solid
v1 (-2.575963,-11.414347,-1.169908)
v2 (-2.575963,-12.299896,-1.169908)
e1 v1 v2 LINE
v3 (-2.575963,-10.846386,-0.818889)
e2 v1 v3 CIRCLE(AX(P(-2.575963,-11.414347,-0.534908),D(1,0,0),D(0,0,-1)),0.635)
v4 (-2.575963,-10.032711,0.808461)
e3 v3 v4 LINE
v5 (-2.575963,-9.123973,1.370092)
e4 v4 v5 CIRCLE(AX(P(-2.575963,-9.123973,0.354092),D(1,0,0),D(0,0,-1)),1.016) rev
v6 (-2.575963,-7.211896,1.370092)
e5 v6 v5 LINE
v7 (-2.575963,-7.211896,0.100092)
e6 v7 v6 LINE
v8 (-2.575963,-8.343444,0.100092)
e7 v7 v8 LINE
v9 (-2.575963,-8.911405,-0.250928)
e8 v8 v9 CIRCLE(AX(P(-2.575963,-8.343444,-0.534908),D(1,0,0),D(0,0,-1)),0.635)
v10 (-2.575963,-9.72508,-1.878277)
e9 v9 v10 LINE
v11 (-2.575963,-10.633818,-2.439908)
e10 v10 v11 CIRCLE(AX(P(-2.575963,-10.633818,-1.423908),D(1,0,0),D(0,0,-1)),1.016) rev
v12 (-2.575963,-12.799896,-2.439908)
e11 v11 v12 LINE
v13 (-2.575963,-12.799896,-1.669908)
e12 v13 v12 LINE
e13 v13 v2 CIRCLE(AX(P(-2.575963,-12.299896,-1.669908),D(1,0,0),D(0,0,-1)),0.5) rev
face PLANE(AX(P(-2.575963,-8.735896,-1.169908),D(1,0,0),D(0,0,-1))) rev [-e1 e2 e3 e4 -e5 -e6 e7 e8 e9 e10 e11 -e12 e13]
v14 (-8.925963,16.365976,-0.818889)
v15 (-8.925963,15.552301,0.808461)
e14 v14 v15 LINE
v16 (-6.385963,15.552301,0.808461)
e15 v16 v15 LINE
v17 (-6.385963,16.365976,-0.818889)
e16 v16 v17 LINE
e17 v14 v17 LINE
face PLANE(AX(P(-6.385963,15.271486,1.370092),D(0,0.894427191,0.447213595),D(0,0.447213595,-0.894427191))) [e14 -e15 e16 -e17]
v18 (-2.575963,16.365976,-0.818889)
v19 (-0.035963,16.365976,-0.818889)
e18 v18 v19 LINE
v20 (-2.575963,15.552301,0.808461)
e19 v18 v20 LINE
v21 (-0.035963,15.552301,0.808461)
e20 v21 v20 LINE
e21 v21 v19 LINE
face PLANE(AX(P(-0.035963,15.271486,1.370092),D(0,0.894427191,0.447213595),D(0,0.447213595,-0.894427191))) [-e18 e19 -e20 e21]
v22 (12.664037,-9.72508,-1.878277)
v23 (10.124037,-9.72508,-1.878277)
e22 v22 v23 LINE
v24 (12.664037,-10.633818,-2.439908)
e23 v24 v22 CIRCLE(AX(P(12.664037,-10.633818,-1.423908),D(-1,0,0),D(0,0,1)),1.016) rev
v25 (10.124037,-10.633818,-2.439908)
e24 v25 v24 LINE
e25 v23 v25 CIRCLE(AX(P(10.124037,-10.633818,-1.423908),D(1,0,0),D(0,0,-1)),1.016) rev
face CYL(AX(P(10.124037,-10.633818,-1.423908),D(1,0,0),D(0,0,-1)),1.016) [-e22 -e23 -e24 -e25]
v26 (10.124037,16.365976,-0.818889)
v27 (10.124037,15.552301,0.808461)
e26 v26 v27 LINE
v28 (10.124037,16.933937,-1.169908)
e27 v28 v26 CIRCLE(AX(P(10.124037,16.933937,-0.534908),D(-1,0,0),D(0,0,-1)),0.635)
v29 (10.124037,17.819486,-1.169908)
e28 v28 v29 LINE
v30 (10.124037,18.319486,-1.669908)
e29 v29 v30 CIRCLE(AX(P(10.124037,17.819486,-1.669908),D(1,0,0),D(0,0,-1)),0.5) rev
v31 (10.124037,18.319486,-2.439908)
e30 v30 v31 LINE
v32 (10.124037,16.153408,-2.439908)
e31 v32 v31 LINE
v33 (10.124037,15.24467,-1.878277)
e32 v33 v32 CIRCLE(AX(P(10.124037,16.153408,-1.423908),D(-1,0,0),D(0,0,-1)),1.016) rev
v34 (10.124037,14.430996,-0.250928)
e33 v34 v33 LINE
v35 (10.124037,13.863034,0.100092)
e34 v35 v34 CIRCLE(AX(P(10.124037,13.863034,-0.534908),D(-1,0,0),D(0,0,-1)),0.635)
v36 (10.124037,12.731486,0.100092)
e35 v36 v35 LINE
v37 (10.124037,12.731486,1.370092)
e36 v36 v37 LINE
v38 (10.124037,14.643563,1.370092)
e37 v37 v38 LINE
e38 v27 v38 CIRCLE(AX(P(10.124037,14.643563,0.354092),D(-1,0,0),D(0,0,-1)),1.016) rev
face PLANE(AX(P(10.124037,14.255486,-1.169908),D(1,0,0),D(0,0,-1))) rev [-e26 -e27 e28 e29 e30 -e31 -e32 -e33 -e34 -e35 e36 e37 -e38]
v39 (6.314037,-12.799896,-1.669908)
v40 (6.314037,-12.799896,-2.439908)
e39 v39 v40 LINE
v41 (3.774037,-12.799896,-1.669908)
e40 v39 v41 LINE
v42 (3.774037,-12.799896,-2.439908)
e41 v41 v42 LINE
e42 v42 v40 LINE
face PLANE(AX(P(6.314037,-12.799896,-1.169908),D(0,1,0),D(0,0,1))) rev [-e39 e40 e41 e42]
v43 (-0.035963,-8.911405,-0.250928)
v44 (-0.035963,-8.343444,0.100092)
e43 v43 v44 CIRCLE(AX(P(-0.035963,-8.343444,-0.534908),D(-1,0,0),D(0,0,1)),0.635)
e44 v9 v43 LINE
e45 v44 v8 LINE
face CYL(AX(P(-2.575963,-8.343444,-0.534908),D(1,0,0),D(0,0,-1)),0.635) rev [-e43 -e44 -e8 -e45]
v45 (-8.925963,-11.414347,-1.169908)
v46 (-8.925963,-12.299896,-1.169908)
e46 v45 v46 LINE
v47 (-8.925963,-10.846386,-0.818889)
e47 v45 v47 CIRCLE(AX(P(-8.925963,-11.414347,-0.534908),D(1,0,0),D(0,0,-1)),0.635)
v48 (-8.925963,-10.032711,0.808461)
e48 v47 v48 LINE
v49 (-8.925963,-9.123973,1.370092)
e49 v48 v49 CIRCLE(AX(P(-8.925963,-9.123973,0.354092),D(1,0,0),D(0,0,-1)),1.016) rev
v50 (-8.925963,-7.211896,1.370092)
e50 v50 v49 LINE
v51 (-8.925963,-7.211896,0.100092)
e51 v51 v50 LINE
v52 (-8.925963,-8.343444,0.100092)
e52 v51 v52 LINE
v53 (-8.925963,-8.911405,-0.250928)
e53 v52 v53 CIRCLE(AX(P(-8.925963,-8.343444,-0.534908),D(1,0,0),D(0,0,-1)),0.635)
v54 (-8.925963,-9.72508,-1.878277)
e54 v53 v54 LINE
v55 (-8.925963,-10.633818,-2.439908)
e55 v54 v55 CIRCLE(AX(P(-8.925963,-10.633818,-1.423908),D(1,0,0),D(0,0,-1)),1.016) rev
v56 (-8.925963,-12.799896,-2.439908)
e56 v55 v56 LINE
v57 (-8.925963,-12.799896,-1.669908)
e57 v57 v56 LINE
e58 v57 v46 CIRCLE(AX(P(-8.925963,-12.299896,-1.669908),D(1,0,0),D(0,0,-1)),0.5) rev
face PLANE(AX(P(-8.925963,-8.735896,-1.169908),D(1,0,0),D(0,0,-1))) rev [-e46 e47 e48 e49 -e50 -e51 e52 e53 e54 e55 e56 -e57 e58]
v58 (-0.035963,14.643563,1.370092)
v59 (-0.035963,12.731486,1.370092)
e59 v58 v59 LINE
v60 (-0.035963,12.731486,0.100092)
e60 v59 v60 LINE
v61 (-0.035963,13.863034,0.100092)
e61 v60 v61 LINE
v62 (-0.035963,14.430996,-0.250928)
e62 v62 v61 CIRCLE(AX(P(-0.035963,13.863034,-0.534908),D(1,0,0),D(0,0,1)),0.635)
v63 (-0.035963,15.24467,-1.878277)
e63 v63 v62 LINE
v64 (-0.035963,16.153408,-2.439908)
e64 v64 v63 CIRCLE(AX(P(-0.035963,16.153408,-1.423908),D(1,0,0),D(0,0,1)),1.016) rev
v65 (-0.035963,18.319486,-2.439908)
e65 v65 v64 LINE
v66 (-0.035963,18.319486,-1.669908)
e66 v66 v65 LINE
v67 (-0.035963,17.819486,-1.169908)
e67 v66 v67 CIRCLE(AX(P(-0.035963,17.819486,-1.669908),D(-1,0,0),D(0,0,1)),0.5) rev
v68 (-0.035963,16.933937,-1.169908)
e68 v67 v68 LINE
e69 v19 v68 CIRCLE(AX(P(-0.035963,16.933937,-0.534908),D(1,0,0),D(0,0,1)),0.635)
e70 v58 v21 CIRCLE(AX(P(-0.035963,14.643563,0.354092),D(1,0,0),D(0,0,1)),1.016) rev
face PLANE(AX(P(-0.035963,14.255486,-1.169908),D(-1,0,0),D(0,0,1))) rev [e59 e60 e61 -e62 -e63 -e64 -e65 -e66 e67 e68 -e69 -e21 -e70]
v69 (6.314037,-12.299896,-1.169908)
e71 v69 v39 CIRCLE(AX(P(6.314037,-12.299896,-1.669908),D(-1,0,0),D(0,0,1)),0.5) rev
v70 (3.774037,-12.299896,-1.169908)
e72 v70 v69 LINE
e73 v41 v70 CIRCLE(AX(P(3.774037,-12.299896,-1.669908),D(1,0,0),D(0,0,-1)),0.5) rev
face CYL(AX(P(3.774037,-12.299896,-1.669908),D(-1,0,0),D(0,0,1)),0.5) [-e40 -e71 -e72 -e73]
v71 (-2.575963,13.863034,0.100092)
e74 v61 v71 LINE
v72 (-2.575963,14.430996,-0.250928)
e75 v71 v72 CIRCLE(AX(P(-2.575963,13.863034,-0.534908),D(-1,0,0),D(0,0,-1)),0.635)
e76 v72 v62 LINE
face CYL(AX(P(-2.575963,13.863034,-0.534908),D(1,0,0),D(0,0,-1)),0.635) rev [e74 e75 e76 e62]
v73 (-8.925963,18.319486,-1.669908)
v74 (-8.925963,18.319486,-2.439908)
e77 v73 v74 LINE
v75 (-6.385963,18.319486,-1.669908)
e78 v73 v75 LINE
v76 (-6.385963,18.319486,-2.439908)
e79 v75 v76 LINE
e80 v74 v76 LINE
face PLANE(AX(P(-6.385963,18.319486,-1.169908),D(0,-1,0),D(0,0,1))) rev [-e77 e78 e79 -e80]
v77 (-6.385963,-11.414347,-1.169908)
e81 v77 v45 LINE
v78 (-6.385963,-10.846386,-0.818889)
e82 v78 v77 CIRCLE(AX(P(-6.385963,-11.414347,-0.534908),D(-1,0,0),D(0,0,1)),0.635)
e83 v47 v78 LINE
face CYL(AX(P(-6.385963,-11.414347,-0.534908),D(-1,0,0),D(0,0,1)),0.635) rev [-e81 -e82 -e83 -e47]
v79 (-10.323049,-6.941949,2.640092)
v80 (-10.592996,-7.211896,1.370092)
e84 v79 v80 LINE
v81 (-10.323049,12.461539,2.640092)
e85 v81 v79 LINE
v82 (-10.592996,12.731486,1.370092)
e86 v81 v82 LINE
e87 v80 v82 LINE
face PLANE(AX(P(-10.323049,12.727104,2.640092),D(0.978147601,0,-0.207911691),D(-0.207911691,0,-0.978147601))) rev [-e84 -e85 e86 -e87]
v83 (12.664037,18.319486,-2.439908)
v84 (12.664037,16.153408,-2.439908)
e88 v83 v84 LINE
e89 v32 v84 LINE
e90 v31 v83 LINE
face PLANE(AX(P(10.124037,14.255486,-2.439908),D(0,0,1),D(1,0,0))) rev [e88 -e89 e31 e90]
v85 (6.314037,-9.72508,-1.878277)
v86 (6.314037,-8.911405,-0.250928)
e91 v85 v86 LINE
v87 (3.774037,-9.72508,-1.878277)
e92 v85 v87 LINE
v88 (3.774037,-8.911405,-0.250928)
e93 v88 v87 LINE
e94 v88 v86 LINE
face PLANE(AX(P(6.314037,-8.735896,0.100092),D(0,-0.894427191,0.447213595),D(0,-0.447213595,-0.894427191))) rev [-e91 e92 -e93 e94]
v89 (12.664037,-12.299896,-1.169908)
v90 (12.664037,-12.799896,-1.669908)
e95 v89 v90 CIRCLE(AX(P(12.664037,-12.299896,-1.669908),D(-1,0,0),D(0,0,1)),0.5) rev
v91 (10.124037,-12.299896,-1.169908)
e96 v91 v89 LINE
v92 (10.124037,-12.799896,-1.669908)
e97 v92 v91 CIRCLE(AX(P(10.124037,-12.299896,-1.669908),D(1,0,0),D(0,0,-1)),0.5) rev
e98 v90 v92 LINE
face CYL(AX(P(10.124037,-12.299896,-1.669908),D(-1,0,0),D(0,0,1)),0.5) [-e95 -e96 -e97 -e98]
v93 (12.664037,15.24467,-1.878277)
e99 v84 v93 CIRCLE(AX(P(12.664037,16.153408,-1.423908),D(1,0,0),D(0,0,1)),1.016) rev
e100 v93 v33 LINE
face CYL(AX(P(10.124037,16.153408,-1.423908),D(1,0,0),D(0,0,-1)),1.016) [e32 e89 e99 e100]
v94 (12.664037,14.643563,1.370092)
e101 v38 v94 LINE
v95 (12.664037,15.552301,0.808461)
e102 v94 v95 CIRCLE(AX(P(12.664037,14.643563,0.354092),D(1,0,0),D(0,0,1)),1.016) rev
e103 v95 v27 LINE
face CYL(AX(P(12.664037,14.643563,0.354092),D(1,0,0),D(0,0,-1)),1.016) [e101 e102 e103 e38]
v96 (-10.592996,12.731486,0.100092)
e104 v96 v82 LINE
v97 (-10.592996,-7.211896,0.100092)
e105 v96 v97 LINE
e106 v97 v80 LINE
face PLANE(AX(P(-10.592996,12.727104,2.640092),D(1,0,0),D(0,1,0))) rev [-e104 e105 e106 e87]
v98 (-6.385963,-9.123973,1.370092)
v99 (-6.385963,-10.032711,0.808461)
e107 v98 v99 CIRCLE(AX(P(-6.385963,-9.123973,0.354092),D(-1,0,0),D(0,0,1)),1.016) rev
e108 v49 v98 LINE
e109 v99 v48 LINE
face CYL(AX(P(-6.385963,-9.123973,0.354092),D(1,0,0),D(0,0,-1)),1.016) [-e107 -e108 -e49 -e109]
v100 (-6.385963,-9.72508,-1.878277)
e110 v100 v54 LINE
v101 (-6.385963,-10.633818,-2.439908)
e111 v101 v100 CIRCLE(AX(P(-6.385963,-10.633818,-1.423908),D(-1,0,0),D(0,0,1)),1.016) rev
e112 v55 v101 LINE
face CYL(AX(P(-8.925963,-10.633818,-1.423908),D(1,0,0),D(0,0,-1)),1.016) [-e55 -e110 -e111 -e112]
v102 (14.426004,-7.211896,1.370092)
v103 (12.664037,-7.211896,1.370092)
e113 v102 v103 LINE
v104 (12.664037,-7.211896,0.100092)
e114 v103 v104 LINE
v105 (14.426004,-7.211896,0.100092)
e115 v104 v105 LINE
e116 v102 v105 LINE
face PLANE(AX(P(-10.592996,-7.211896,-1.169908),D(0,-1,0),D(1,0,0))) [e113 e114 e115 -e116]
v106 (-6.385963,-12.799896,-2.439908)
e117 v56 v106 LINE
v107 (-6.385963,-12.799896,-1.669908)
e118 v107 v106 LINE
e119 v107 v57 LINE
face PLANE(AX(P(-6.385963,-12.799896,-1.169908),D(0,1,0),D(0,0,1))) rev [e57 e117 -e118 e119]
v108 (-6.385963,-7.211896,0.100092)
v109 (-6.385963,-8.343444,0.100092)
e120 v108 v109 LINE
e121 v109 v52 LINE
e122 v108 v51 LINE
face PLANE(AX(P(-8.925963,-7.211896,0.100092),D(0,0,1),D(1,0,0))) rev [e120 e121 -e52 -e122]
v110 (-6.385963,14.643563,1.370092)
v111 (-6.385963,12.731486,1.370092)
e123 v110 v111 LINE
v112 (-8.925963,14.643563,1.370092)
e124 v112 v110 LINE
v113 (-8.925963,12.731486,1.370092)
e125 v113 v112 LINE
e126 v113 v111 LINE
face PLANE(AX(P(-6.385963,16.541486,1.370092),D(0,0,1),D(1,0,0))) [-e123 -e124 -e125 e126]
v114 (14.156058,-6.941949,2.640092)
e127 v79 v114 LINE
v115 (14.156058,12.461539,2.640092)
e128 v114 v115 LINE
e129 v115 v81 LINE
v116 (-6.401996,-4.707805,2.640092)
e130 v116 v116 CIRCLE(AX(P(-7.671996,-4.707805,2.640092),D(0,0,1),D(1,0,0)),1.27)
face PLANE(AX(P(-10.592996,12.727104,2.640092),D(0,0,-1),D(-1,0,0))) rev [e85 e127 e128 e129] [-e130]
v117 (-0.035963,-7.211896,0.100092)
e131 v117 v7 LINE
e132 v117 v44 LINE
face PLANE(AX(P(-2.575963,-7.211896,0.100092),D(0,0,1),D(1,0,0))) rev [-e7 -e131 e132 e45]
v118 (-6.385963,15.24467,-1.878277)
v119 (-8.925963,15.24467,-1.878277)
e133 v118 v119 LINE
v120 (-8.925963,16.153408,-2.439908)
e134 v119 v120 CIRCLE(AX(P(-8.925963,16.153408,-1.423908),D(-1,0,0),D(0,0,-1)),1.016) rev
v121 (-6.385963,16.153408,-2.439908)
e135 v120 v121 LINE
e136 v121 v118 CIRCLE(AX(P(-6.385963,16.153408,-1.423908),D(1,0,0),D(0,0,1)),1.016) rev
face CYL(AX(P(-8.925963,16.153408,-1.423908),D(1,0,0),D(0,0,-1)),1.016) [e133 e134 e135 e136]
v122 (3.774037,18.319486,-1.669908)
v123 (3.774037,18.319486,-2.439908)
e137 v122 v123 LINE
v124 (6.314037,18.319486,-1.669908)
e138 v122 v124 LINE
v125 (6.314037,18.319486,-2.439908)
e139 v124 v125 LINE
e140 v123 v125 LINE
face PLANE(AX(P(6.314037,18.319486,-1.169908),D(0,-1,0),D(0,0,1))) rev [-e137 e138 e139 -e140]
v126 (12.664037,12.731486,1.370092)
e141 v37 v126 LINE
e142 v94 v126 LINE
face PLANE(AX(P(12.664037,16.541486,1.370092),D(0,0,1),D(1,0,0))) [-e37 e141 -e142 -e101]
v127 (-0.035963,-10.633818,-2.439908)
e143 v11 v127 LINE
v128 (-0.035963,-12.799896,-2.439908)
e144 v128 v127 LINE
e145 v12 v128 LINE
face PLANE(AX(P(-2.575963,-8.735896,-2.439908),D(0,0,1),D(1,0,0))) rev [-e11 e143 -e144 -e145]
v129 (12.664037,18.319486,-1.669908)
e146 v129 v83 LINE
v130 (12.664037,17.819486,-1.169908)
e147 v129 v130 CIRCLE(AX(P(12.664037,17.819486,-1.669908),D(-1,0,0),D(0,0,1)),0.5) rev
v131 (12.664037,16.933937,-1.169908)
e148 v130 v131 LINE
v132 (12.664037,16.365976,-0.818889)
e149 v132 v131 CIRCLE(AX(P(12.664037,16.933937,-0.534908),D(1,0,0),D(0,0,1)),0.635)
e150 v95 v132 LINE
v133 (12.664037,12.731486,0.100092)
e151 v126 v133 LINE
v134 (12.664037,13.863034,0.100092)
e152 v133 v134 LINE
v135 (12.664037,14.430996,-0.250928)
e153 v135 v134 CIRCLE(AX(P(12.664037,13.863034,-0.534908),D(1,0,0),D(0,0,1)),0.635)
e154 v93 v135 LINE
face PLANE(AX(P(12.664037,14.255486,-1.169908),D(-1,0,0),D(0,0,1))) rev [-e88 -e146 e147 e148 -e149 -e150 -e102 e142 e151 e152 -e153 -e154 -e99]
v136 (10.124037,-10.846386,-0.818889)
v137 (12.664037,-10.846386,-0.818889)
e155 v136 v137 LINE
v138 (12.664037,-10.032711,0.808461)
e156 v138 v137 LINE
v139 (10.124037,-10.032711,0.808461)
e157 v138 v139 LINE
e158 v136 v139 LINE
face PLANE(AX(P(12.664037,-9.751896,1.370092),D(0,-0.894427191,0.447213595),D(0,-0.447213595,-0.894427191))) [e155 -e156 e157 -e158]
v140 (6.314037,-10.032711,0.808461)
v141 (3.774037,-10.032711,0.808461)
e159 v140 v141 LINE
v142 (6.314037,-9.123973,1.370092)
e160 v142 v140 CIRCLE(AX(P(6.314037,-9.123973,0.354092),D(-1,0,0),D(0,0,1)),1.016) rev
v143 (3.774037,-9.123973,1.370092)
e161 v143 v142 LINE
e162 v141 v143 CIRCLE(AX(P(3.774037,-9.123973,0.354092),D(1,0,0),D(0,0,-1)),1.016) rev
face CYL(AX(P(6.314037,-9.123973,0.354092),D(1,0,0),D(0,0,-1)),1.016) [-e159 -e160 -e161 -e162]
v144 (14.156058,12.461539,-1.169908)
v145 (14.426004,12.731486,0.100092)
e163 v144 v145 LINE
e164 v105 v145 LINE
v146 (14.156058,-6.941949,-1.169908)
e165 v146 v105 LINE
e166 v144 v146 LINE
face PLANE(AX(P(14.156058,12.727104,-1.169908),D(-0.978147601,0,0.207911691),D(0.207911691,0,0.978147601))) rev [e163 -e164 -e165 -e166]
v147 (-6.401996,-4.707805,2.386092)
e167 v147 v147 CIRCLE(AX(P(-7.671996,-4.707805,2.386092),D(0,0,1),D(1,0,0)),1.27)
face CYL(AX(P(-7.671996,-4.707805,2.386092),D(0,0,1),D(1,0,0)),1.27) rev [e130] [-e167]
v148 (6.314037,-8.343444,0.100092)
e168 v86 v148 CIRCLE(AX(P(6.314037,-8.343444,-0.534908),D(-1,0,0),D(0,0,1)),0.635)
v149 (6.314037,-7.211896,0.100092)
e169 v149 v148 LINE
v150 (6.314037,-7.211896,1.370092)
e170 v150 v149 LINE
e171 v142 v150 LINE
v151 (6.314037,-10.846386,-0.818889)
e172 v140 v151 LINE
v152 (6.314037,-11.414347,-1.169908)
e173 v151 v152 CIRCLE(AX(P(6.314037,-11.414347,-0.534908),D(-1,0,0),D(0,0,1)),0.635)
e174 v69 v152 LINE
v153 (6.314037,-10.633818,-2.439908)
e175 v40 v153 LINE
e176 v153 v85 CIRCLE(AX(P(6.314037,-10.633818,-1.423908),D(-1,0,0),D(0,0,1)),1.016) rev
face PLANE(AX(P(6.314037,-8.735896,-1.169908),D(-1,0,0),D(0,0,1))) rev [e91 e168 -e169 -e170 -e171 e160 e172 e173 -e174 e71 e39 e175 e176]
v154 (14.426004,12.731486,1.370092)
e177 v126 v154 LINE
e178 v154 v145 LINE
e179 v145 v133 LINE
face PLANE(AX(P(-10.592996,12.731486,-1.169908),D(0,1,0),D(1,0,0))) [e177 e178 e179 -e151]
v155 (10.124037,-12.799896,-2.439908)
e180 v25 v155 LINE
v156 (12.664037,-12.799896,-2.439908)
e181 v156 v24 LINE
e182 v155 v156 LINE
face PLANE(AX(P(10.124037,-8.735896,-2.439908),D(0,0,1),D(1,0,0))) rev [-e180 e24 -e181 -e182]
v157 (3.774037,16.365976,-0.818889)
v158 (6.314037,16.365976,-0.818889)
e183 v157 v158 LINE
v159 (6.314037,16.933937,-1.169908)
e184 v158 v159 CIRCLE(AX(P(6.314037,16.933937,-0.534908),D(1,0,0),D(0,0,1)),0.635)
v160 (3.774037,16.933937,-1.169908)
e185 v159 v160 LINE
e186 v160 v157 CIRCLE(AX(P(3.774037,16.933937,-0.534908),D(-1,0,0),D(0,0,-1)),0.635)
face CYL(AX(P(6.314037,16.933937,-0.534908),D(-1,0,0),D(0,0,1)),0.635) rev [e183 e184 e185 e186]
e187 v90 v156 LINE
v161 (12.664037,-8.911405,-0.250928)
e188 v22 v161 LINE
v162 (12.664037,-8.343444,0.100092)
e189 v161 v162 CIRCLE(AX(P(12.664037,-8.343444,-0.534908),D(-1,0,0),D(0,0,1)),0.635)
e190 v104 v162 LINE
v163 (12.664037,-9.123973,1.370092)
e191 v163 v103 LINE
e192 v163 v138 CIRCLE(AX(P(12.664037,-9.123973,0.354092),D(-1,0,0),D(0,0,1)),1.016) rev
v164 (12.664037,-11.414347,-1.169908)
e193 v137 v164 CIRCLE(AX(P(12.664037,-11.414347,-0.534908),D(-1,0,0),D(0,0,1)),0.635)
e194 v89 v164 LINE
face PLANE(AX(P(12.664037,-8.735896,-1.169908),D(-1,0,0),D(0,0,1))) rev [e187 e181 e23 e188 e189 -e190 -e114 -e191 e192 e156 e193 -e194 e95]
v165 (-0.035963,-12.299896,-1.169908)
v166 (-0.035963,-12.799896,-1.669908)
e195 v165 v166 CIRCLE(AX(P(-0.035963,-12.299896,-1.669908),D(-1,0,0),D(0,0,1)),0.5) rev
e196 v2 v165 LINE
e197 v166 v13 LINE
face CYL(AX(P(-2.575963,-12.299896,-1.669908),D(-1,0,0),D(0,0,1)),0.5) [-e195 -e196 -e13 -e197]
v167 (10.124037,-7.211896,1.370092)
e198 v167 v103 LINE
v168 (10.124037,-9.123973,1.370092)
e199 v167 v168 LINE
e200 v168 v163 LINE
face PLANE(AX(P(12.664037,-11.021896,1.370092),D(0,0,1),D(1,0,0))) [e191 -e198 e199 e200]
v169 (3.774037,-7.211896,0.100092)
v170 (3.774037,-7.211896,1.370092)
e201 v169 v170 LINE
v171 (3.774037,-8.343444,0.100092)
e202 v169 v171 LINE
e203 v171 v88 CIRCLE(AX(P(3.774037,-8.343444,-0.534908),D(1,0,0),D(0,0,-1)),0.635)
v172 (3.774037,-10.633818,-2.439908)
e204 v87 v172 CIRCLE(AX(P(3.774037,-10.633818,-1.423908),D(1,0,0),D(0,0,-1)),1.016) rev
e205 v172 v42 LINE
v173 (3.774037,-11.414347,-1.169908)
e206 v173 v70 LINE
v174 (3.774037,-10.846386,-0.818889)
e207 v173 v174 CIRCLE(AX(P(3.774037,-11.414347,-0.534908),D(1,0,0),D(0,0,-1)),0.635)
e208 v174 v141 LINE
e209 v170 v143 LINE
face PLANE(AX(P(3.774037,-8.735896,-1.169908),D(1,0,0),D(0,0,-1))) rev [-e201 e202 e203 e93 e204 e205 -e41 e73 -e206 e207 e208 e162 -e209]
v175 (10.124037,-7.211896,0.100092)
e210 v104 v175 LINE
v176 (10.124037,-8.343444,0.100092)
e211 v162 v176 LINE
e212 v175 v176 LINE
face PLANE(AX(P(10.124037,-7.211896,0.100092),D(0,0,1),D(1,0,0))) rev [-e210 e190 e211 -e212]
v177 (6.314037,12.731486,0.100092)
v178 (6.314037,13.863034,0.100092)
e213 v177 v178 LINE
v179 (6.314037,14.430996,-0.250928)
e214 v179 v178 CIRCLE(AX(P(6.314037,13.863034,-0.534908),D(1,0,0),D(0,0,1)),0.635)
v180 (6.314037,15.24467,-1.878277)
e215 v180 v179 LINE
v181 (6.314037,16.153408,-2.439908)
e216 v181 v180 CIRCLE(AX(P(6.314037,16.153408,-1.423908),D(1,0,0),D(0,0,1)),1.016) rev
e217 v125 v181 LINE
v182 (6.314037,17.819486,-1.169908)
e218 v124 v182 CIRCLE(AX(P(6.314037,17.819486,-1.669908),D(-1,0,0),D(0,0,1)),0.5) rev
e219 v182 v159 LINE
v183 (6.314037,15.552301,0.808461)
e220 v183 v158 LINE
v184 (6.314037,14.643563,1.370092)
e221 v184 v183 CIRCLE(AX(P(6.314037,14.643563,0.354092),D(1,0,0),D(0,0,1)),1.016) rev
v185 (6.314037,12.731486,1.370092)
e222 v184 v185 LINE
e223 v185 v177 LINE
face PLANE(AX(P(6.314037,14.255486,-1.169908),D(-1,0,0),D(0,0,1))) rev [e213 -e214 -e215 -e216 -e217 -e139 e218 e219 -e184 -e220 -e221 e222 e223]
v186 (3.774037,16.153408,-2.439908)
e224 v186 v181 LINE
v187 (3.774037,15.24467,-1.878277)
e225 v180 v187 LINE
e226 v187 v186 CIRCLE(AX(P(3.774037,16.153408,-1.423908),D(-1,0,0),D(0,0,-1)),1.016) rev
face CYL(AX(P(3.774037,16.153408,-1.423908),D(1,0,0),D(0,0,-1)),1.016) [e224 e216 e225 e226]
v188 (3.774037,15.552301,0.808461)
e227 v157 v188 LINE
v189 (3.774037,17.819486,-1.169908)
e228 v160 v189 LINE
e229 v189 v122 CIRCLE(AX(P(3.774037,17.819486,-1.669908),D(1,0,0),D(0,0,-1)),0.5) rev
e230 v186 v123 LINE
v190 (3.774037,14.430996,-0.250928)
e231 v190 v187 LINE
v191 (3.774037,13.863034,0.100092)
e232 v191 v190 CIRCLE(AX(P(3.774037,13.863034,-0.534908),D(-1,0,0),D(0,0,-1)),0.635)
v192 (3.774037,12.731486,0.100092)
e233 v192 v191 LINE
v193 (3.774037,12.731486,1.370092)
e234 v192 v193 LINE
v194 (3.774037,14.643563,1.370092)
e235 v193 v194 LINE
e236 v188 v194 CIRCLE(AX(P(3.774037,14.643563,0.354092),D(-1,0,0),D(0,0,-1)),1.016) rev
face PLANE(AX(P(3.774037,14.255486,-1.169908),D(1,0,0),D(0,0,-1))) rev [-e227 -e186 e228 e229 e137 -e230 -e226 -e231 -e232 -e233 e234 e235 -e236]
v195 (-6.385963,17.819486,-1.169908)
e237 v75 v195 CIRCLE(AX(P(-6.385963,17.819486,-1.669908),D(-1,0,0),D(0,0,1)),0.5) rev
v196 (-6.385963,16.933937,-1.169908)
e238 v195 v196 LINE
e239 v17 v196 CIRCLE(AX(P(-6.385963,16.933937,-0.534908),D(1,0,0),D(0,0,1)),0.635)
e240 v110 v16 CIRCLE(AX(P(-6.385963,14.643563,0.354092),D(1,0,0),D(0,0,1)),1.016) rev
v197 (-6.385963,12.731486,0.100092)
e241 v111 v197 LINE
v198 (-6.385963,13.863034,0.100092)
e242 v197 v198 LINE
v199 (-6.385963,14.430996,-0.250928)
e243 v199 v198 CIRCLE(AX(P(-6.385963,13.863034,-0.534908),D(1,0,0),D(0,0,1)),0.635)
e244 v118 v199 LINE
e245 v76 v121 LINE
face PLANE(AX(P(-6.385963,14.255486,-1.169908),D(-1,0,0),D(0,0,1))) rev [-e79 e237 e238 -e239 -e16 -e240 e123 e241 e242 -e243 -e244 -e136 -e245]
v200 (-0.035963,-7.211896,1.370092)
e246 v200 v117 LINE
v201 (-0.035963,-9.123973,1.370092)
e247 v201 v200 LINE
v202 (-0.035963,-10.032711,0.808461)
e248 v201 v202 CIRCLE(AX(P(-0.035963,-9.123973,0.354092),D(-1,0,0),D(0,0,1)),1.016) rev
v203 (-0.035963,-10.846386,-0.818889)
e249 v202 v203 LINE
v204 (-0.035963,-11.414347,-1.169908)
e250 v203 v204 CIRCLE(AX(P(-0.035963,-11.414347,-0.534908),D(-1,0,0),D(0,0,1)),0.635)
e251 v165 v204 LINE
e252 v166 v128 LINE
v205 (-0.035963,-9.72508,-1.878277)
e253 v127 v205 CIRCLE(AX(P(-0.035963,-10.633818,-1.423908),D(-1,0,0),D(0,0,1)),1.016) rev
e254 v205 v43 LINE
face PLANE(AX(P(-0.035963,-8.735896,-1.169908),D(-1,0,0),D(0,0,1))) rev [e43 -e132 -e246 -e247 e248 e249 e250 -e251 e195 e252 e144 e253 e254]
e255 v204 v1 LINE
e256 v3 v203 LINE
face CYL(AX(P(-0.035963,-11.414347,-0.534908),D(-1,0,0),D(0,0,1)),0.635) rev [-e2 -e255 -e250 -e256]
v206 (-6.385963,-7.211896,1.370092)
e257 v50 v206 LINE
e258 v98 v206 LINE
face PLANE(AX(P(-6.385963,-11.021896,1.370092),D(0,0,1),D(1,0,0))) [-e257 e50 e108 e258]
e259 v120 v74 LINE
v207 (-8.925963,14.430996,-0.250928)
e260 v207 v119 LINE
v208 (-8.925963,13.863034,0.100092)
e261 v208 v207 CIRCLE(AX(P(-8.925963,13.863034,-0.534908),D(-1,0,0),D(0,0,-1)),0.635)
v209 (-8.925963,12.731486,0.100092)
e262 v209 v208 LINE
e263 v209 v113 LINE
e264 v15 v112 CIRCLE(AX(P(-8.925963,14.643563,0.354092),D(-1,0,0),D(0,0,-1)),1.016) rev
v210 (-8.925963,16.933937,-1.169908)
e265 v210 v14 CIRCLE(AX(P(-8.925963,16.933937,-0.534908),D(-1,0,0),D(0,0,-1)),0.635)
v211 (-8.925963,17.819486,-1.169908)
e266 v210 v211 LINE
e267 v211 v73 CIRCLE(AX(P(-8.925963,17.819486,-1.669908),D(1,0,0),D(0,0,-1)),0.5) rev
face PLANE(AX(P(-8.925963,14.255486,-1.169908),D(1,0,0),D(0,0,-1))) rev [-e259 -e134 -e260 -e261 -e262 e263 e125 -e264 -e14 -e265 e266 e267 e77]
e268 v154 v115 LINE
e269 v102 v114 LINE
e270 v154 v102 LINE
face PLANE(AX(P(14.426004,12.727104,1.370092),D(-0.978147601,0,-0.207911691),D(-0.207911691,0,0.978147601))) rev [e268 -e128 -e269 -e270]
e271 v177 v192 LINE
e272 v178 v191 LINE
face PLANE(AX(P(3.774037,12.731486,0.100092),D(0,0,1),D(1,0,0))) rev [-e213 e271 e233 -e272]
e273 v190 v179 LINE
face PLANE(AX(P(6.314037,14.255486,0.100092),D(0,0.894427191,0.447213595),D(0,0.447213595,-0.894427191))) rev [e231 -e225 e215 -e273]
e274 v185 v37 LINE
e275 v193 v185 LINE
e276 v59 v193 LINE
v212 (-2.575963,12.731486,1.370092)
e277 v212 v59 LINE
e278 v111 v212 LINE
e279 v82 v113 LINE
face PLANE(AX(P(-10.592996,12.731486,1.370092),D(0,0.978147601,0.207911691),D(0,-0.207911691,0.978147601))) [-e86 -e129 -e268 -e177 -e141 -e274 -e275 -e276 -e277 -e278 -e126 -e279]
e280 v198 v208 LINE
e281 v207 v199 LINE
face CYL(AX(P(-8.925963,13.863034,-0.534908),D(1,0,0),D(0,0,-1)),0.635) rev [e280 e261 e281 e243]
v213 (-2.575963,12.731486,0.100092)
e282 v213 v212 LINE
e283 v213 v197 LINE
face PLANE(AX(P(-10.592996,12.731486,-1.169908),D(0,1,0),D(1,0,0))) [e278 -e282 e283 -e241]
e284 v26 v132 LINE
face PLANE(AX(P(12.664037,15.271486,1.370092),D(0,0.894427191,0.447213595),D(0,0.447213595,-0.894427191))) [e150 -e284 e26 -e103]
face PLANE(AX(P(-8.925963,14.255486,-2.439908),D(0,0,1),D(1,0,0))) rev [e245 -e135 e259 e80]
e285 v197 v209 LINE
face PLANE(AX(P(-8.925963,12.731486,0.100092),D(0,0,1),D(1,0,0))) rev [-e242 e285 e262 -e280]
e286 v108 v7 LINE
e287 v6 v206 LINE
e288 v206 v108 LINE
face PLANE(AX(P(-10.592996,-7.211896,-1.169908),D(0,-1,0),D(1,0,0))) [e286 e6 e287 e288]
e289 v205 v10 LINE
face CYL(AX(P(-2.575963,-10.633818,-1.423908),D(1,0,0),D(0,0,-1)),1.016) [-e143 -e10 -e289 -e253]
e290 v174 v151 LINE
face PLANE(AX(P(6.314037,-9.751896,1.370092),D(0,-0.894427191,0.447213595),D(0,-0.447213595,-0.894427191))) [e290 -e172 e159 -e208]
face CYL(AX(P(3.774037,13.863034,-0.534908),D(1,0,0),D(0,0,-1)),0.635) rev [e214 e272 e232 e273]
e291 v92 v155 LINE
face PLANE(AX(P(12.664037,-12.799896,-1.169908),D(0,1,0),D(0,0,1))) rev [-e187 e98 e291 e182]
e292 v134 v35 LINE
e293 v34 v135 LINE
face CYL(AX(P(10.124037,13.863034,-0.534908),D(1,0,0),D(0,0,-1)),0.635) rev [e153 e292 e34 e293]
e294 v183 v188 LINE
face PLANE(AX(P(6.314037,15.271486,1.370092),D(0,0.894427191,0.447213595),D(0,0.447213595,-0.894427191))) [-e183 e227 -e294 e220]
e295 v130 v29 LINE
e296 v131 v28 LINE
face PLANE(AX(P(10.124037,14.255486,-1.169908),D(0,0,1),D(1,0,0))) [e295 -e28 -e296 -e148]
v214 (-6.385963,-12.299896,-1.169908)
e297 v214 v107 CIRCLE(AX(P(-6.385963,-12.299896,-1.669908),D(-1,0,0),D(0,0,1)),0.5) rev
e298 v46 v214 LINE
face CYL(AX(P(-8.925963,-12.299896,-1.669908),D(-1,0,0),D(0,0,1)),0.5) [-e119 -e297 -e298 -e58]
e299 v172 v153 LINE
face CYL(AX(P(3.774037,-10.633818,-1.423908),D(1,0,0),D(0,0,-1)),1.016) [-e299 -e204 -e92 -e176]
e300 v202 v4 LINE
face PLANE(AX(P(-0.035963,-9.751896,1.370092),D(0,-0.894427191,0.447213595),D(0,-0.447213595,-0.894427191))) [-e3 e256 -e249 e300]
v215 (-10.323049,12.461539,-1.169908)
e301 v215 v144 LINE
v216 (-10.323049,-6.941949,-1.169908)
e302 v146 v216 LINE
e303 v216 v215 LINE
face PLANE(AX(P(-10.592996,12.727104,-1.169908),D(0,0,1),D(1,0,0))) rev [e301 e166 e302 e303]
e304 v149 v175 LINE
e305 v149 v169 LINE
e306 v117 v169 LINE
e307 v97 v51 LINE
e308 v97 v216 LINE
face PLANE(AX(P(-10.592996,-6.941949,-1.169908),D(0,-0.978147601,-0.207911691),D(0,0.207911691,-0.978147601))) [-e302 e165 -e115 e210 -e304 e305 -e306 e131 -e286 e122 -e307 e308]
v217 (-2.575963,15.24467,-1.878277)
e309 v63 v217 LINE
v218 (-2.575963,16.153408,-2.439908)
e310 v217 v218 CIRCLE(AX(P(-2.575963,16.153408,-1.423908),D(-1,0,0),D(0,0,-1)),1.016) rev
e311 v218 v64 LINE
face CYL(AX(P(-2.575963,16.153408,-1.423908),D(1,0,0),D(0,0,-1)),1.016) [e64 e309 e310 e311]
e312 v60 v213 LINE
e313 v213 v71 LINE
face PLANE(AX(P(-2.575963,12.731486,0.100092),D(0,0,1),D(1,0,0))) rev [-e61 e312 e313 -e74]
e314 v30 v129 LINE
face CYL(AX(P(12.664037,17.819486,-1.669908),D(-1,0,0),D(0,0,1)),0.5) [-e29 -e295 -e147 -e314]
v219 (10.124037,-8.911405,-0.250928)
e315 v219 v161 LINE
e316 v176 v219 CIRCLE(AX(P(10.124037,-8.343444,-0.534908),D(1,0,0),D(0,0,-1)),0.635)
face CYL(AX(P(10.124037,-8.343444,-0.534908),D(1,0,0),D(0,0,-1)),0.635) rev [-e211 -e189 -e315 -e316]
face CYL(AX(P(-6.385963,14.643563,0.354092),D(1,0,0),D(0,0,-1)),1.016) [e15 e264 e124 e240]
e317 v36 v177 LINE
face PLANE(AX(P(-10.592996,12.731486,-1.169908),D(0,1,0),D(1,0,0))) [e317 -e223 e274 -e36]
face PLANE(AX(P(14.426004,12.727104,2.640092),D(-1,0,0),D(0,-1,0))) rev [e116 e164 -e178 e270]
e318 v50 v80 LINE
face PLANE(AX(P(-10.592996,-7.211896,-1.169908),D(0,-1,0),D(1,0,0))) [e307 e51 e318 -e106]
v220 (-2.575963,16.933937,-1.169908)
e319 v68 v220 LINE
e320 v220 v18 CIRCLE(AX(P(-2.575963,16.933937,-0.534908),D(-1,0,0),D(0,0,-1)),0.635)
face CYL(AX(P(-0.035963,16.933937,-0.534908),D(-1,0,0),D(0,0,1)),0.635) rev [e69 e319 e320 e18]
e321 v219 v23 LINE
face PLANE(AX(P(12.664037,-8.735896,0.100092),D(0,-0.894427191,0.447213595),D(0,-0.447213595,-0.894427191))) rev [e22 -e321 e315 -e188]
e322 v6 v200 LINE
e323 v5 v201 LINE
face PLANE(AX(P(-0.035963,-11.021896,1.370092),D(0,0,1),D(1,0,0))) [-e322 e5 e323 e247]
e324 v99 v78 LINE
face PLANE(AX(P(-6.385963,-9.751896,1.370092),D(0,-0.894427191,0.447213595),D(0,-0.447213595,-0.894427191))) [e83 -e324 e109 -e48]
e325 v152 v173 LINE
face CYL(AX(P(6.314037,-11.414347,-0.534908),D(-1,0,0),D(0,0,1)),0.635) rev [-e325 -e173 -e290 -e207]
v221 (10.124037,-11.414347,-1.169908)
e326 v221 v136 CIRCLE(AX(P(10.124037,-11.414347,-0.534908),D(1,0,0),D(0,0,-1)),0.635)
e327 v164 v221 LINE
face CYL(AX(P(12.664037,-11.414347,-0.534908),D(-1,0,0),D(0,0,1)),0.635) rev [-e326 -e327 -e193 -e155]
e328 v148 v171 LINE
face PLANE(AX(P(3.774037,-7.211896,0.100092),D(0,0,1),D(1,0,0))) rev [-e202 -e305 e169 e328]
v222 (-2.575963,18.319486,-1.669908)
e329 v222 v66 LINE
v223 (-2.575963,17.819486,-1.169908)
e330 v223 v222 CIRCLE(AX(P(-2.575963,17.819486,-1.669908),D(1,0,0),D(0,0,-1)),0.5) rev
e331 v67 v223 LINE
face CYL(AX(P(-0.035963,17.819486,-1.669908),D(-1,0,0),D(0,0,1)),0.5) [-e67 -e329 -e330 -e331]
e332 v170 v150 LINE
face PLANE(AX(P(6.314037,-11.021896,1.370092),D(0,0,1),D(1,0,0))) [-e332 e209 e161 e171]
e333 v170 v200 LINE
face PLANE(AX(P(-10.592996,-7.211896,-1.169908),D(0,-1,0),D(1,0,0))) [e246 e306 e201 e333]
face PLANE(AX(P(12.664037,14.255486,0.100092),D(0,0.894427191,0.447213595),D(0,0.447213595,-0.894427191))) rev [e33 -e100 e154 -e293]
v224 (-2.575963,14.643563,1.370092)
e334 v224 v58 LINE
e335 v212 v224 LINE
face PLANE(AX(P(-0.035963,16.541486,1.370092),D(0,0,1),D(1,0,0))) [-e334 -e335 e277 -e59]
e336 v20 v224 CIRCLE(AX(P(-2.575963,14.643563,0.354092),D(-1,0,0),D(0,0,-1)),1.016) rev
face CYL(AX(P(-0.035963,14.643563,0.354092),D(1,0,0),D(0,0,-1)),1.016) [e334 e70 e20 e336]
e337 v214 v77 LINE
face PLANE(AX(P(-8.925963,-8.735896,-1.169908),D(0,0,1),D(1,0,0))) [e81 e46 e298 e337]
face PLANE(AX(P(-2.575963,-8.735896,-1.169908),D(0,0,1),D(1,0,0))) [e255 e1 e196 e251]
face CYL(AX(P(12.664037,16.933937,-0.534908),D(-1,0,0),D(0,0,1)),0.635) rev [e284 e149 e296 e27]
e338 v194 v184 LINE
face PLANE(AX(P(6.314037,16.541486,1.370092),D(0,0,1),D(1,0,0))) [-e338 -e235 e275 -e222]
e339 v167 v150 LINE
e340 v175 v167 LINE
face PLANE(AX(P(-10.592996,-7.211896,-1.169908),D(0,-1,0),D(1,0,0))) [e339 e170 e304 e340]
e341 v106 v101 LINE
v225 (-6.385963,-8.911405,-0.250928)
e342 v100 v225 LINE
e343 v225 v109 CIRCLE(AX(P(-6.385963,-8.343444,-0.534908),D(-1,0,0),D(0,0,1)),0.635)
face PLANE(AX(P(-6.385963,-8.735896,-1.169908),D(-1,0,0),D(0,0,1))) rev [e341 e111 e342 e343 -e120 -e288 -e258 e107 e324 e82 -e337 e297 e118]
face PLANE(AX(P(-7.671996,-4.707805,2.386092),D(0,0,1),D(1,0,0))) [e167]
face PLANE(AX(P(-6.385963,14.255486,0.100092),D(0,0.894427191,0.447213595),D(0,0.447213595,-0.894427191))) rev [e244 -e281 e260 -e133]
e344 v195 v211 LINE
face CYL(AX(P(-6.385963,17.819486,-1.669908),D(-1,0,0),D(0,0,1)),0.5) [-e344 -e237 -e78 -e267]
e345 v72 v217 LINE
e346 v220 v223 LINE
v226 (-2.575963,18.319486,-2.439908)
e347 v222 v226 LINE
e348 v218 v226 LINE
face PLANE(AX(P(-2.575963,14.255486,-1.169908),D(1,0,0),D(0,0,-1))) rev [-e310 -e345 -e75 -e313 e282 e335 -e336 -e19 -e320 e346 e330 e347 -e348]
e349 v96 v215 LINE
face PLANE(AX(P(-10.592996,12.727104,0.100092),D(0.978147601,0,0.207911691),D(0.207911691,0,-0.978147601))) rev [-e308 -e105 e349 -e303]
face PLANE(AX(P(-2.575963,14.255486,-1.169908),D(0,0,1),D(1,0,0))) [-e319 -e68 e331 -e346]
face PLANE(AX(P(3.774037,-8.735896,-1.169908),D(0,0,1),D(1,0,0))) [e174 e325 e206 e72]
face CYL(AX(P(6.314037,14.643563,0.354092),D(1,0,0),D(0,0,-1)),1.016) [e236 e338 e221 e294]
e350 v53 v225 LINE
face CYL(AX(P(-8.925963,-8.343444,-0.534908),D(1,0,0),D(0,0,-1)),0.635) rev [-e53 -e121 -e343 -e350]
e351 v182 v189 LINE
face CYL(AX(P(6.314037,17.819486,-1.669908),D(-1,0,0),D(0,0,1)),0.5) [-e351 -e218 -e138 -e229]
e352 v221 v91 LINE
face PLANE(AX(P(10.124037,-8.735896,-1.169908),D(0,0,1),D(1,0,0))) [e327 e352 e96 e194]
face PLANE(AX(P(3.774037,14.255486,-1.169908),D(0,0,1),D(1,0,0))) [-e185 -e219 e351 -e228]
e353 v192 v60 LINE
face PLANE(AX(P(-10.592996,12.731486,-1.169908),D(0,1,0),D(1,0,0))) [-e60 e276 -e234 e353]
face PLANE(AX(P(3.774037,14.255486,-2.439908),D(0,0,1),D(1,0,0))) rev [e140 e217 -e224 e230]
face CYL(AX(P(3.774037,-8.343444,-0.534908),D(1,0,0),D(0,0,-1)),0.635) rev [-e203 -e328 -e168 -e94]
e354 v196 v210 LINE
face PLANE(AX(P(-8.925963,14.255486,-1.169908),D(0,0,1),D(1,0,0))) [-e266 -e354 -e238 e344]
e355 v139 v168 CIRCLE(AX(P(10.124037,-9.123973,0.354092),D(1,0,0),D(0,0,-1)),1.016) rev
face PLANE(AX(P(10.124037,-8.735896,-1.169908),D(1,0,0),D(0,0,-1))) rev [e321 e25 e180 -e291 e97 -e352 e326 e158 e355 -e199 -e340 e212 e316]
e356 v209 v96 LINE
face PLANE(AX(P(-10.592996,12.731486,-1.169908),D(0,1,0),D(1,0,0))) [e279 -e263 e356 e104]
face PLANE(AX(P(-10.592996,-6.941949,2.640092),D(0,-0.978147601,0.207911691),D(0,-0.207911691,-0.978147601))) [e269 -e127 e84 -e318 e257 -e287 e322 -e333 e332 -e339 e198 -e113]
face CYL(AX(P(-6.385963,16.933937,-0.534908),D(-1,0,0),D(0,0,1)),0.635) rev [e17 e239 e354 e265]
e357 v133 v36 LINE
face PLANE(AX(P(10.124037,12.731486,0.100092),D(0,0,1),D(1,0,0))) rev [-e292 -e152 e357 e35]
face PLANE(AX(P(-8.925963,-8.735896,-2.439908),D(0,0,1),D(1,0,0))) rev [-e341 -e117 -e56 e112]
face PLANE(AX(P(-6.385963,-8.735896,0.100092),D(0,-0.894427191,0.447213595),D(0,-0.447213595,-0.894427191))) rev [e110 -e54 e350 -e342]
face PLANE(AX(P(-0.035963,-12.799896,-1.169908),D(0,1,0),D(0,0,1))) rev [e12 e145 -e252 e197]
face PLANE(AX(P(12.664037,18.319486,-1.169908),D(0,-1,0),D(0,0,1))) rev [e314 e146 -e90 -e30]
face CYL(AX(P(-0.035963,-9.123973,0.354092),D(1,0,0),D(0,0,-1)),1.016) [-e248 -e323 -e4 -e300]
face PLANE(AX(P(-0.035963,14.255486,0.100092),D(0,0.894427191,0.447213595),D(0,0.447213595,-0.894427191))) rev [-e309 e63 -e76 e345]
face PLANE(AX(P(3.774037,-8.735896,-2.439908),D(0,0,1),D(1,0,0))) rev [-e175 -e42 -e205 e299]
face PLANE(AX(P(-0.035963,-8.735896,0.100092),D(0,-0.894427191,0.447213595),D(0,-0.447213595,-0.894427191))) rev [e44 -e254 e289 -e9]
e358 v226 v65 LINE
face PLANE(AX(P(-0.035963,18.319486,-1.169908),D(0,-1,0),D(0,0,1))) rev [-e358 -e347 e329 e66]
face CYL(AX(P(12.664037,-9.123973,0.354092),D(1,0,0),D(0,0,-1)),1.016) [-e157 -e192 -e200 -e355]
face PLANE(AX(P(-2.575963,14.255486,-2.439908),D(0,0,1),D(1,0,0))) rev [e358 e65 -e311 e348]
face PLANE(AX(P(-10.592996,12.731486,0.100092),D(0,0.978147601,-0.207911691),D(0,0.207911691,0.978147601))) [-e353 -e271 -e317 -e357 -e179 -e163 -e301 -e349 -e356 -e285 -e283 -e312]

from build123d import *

# Parameters (mm, degrees)
SKETCH1_W            = 0.8128
SKETCH1_H            = 0.508
BASE_EXTRUDE_DEPTH   = 0.254
SKETCH6_W            = 0.4572
SKETCH6_H            = 0.508
BOSS_EXTRUDE1_DEPTH  = 0.508
CHAMFER1_SIZE        = 0.508
CHAMFER1_SIZE_2      = 0.254
CHAMFER2_SIZE        = 0.254
CHAMFER2_SIZE2       = 0.508
SKETCH12_W           = 0.508
SKETCH12_H           = 0.254
BOSS_EXTRUDE6_DEPTH  = 0.3048
SKETCH13_W           = 5.0038
SKETCH13_H           = 0.762
BOSS_EXTRUDE7_DEPTH  = 3.9878
FILLET3_R            = 0.127
FILLET4_R            = 0.2032
LPATTERN5_START      = 1.019206572
LPATTERN5_DEPTH      = 0.508
LPATTERN5_START_2    = 2.289206572
LPATTERN5_2_DEPTH    = 0.508
LPATTERN5_START_3    = 3.559206572
LPATTERN5_3_DEPTH    = 0.508
MIRROR22_START       = -0.250793428
MIRROR22_DEPTH       = 0.508
MIRROR22_START_2     = 1.019206572
MIRROR22_2_DEPTH     = 0.508
MIRROR22_START_3     = 2.289206572
MIRROR22_3_DEPTH     = 0.508
MIRROR22_START_4     = 3.559206572
MIRROR22_4_DEPTH     = 0.508
MIRROR22_START_5     = -0.5842
MIRROR22_5_OUTLINE_W = 0.000876316
MIRROR22_5_OUTLINE_H = 0.762
MIRROR22_5_DEPTH     = 5.0038
CHAMFER3_SIZE        = 0.254
CHAMFER3_SIZE_2      = 0.053989367
SKETCH14_R           = 0.254
CUT_EXTRUDE1_DEPTH   = 0.0508
SCALE1_SCALE         = 5
FILLET5_R            = 0.500000016


# Read off the part's stored shape, not the designer's step: LPattern5, Mirror22
with BuildPart() as part:
    # Sketch1 → Base-Extrude (new body)
    with BuildSketch(Plane(origin=(0.003206572, 0.159581842, 0), x_dir=(0, -1, 0), z_dir=(0, 0, 1))):
        with Locations((0.1016, 0)):
            Rectangle(SKETCH1_W, SKETCH1_H)
    extrude(amount=BASE_EXTRUDE_DEPTH)

    # Sketch6 → Boss-Extrude1 (add)
    with BuildSketch(Plane(origin=(0.003206572, -0.043618158, 0.254), x_dir=(0, 1, 0), z_dir=(0, 0, 1))):
        with Locations((0.2794, 0)):
            Rectangle(SKETCH6_W, SKETCH6_H)
    extrude(amount=BOSS_EXTRUDE1_DEPTH)

    # Chamfer1
    # the kernel refuses this chamfer: 0.508, 0.254 mm, written as the material it takes off along each edge
    with BuildSketch(Plane(origin=(1.572839639, 0.007181842, 0.762), x_dir=(0, -0.017268075123668125, -0.9998508956747116), z_dir=(-1, 0, 0))) as chamfer1_piece_1_section:
        Polygon((CHAMFER1_SIZE * 0.999850895675, -CHAMFER1_SIZE * 0.0172680751237), (-CHAMFER1_SIZE_2 * 0.0172680751237, -CHAMFER1_SIZE_2 * 0.999850895675), (0, 0), align=None)
    chamfer1_piece_1 = extrude(amount=3.139266136, mode=Mode.PRIVATE)
    chamfer1_piece_1 = split(chamfer1_piece_1, bisect_by=Plane(origin=(0.003206572, 0.088077409, 0.254), z_dir=(0, 0, 1)), keep=Keep.TOP, mode=Mode.PRIVATE)
    add(chamfer1_piece_1, mode=Mode.SUBTRACT)

    # Chamfer2
    chamfer2_edges = [part.edges().sort_by_distance(p)[0] for p in [
        (0.003206572, 0.464381842, 0),
    ]]
    chamfer2_side = [part.faces().sort_by_distance(p)[0] for p in [
        (0.003206572, 0.057981842, 0),
    ]]
    chamfer(chamfer2_edges, length=CHAMFER2_SIZE, length2=CHAMFER2_SIZE2, reference=chamfer2_side[0])

    # Sketch12 → Boss-Extrude6 (add)
    with BuildSketch(Plane(origin=(0, 0.464381842, 0), x_dir=(-1, 0, 0), z_dir=(0, 1, 0))):
        with Locations((-0.003206572, 0.635)):
            Rectangle(SKETCH12_W, SKETCH12_H)
    extrude(amount=BOSS_EXTRUDE6_DEPTH)

    # Sketch13 → Boss-Extrude7 (add)
    with BuildSketch(Plane(origin=(0, 0.769181842, 0), x_dir=(-1, 0, 0), z_dir=(0, 1, 0))):
        with Locations((-1.9177, 0.635)):
            Rectangle(SKETCH13_W, SKETCH13_H)
    extrude(amount=BOSS_EXTRUDE7_DEPTH)

    # Fillet3
    fillet3_edges = [part.edges().sort_by_distance(p)[0] for p in [
        (0.003206572, 0.007181842, 0.254),
        (0.003206572, 0.464381842, 0.508),
    ]]
    fillet(fillet3_edges, radius=FILLET3_R)

    # Fillet4
    fillet4_edges = [part.edges().sort_by_distance(p)[0] for p in [
        (0.003206572, 0.261181842, 0.762),
        (0.003206572, 0.210381842, 0),
    ]]
    fillet(fillet4_edges, radius=FILLET4_R)

    # LPattern5 outline → LPattern5 (add)
    with BuildSketch(Plane.YZ.offset(LPATTERN5_START)):
        with BuildLine():
            Line((-0.348418158, 0.254), (-0.348418158, 0))
            Line((-0.348418158, 0), (0.084797335, 0))
            ThreePointArc((0.084797335, 0), (0.191625897, 0.030347756), (0.26654494, 0.112326197))
            Line((0.26654494, 0.112326197), (0.429279905, 0.437796127))
            ThreePointArc((0.429279905, 0.437796127), (0.476104307, 0.489032653), (0.542872158, 0.508))
            Line((0.542872158, 0.508), (0.769181842, 0.508))
            Line((0.769181842, 0.508), (0.769181842, 0.762))
            Line((0.769181842, 0.762), (0.386766348, 0.762))
            ThreePointArc((0.386766348, 0.762), (0.279937786, 0.731652244), (0.205018743, 0.649673803))
            Line((0.205018743, 0.649673803), (0.042283778, 0.324203873))
            ThreePointArc((0.042283778, 0.324203873), (-0.004540624, 0.272967347), (-0.071308475, 0.254))
            Line((-0.071308475, 0.254), (-0.348418158, 0.254))
        make_face()
    extrude(amount=LPATTERN5_DEPTH)

    # LPattern5 2 outline → LPattern5 2 (add)
    with BuildSketch(Plane.YZ.offset(LPATTERN5_START_2)):
        with BuildLine():
            Line((-0.348418158, 0.254), (-0.348418158, 0))
            Line((-0.348418158, 0), (0.084797335, 0))
            ThreePointArc((0.084797335, 0), (0.191625897, 0.030347756), (0.26654494, 0.112326197))
            Line((0.26654494, 0.112326197), (0.429279905, 0.437796127))
            ThreePointArc((0.429279905, 0.437796127), (0.476104307, 0.489032653), (0.542872158, 0.508))
            Line((0.542872158, 0.508), (0.769181842, 0.508))
            Line((0.769181842, 0.508), (0.769181842, 0.762))
            Line((0.769181842, 0.762), (0.386766348, 0.762))
            ThreePointArc((0.386766348, 0.762), (0.279937786, 0.731652244), (0.205018743, 0.649673803))
            Line((0.205018743, 0.649673803), (0.042283778, 0.324203873))
            ThreePointArc((0.042283778, 0.324203873), (-0.004540624, 0.272967347), (-0.071308475, 0.254))
            Line((-0.071308475, 0.254), (-0.348418158, 0.254))
        make_face()
    extrude(amount=LPATTERN5_2_DEPTH)

    # LPattern5 3 outline → LPattern5 3 (add)
    with BuildSketch(Plane.YZ.offset(LPATTERN5_START_3)):
        with BuildLine():
            Line((-0.348418158, 0.254), (-0.348418158, 0))
            Line((-0.348418158, 0), (0.084797335, 0))
            ThreePointArc((0.084797335, 0), (0.191625897, 0.030347756), (0.26654494, 0.112326197))
            Line((0.26654494, 0.112326197), (0.429279905, 0.437796127))
            ThreePointArc((0.429279905, 0.437796127), (0.476104307, 0.489032653), (0.542872158, 0.508))
            Line((0.542872158, 0.508), (0.769181842, 0.508))
            Line((0.769181842, 0.508), (0.769181842, 0.762))
            Line((0.769181842, 0.762), (0.386766348, 0.762))
            ThreePointArc((0.386766348, 0.762), (0.279937786, 0.731652244), (0.205018743, 0.649673803))
            Line((0.205018743, 0.649673803), (0.042283778, 0.324203873))
            ThreePointArc((0.042283778, 0.324203873), (-0.004540624, 0.272967347), (-0.071308475, 0.254))
            Line((-0.071308475, 0.254), (-0.348418158, 0.254))
        make_face()
    extrude(amount=LPATTERN5_3_DEPTH)

    # Mirror22 outline → Mirror22 (add)
    with BuildSketch(Plane.YZ.offset(MIRROR22_START)):
        with BuildLine():
            Line((4.756981842, 0.254), (4.757858158, 0.254))
            Line((4.757858158, 0.254), (4.757858158, 0.508))
            Line((4.757858158, 0.508), (4.984167842, 0.508))
            ThreePointArc((4.984167842, 0.508), (5.050935693, 0.489032653), (5.097760095, 0.437796127))
            Line((5.097760095, 0.437796127), (5.26049506, 0.112326197))
            ThreePointArc((5.26049506, 0.112326197), (5.335414103, 0.030347756), (5.442242665, 0))
            Line((5.442242665, 0), (5.875458158, 0))
            Line((5.875458158, 0), (5.875458158, 0.254))
            Line((5.875458158, 0.254), (5.598348475, 0.254))
            ThreePointArc((5.598348475, 0.254), (5.531580624, 0.272967347), (5.484756222, 0.324203873))
            Line((5.484756222, 0.324203873), (5.322021257, 0.649673803))
            ThreePointArc((5.322021257, 0.649673803), (5.247102214, 0.731652244), (5.140273652, 0.762))
            Line((5.140273652, 0.762), (4.757858158, 0.762))
            Line((4.757858158, 0.762), (4.757858158, 1.016))
            Line((4.757858158, 1.016), (4.756981842, 1.016))
            Line((4.756981842, 1.016), (4.756981842, 0.254))
        make_face()
    extrude(amount=MIRROR22_DEPTH)

    # Mirror22 2 outline → Mirror22 2 (add)
    with BuildSketch(Plane.YZ.offset(MIRROR22_START_2)):
        with BuildLine():
            Line((4.756981842, 0.254), (4.757858158, 0.254))
            Line((4.757858158, 0.254), (4.757858158, 0.508))
            Line((4.757858158, 0.508), (4.984167842, 0.508))
            ThreePointArc((4.984167842, 0.508), (5.050935693, 0.489032653), (5.097760095, 0.437796127))
            Line((5.097760095, 0.437796127), (5.26049506, 0.112326197))
            ThreePointArc((5.26049506, 0.112326197), (5.335414103, 0.030347756), (5.442242665, 0))
            Line((5.442242665, 0), (5.875458158, 0))
            Line((5.875458158, 0), (5.875458158, 0.254))
            Line((5.875458158, 0.254), (5.598348475, 0.254))
            ThreePointArc((5.598348475, 0.254), (5.531580624, 0.272967347), (5.484756222, 0.324203873))
            Line((5.484756222, 0.324203873), (5.322021257, 0.649673803))
            ThreePointArc((5.322021257, 0.649673803), (5.247102214, 0.731652244), (5.140273652, 0.762))
            Line((5.140273652, 0.762), (4.757858158, 0.762))
            Line((4.757858158, 0.762), (4.757858158, 1.016))
            Line((4.757858158, 1.016), (4.756981842, 1.016))
            Line((4.756981842, 1.016), (4.756981842, 0.254))
        make_face()
    extrude(amount=MIRROR22_2_DEPTH)

    # Mirror22 3 outline → Mirror22 3 (add)
    with BuildSketch(Plane.YZ.offset(MIRROR22_START_3)):
        with BuildLine():
            Line((4.756981842, 0.254), (4.757858158, 0.254))
            Line((4.757858158, 0.254), (4.757858158, 0.508))
            Line((4.757858158, 0.508), (4.984167842, 0.508))
            ThreePointArc((4.984167842, 0.508), (5.050935693, 0.489032653), (5.097760095, 0.437796127))
            Line((5.097760095, 0.437796127), (5.26049506, 0.112326197))
            ThreePointArc((5.26049506, 0.112326197), (5.335414103, 0.030347756), (5.442242665, 0))
            Line((5.442242665, 0), (5.875458158, 0))
            Line((5.875458158, 0), (5.875458158, 0.254))
            Line((5.875458158, 0.254), (5.598348475, 0.254))
            ThreePointArc((5.598348475, 0.254), (5.531580624, 0.272967347), (5.484756222, 0.324203873))
            Line((5.484756222, 0.324203873), (5.322021257, 0.649673803))
            ThreePointArc((5.322021257, 0.649673803), (5.247102214, 0.731652244), (5.140273652, 0.762))
            Line((5.140273652, 0.762), (4.757858158, 0.762))
            Line((4.757858158, 0.762), (4.757858158, 1.016))
            Line((4.757858158, 1.016), (4.756981842, 1.016))
            Line((4.756981842, 1.016), (4.756981842, 0.254))
        make_face()
    extrude(amount=MIRROR22_3_DEPTH)

    # Mirror22 4 outline → Mirror22 4 (add)
    with BuildSketch(Plane.YZ.offset(MIRROR22_START_4)):
        with BuildLine():
            Line((4.756981842, 0.254), (4.757858158, 0.254))
            Line((4.757858158, 0.254), (4.757858158, 0.508))
            Line((4.757858158, 0.508), (4.984167842, 0.508))
            ThreePointArc((4.984167842, 0.508), (5.050935693, 0.489032653), (5.097760095, 0.437796127))
            Line((5.097760095, 0.437796127), (5.26049506, 0.112326197))
            ThreePointArc((5.26049506, 0.112326197), (5.335414103, 0.030347756), (5.442242665, 0))
            Line((5.442242665, 0), (5.875458158, 0))
            Line((5.875458158, 0), (5.875458158, 0.254))
            Line((5.875458158, 0.254), (5.598348475, 0.254))
            ThreePointArc((5.598348475, 0.254), (5.531580624, 0.272967347), (5.484756222, 0.324203873))
            Line((5.484756222, 0.324203873), (5.322021257, 0.649673803))
            ThreePointArc((5.322021257, 0.649673803), (5.247102214, 0.731652244), (5.140273652, 0.762))
            Line((5.140273652, 0.762), (4.757858158, 0.762))
            Line((4.757858158, 0.762), (4.757858158, 1.016))
            Line((4.757858158, 1.016), (4.756981842, 1.016))
            Line((4.756981842, 1.016), (4.756981842, 0.254))
        make_face()
    extrude(amount=MIRROR22_4_DEPTH)

    # Mirror22 5 outline → Mirror22 5 (add)
    with BuildSketch(Plane.YZ.offset(MIRROR22_START_5)):
        with Locations((4.75742, 0.635)):
            Rectangle(MIRROR22_5_OUTLINE_W, MIRROR22_5_OUTLINE_H)
    extrude(amount=MIRROR22_5_DEPTH)

    # Chamfer3
    # the kernel refuses this chamfer: 0.254, 0.053989367 mm, written as the material it takes off along each edge
    with BuildSketch(Plane(origin=(5.079466081, 4.757858158, 1.016), x_dir=(0, 0.008003073799517865, -0.9999679748920758), z_dir=(-1, 0, 0)), Plane(origin=(-1.244066081, 0.769181842, 1.016), x_dir=(0, -0.008003073799517023, -0.9999679748920758), z_dir=(1, 0, 0)), Plane(origin=(5.079466081, 0.769181842, 0.254), x_dir=(0, -0.008003073799517023, 0.9999679748920758), z_dir=(-1, 0, 0))) as chamfer3_piece_1:
        Polygon((CHAMFER3_SIZE * 0.999967974892, CHAMFER3_SIZE * 0.00800307379952), (-CHAMFER3_SIZE_2 * 0.00800307374974, CHAMFER3_SIZE_2 * 0.999967968672), (0, 0), align=None)
    extrude(amount=6.323532163, mode=Mode.SUBTRACT)
    with BuildSketch(Plane(origin=(-1.244066081, 4.757858158, 0.254), x_dir=(0, -0.9846701949274145, -0.17442650951506075), z_dir=(1, 0, 0))) as chamfer3_piece_2:
        Polygon((CHAMFER3_SIZE_2 * 0.984670188803, -CHAMFER3_SIZE_2 * 0.17442650843), (-CHAMFER3_SIZE * 0.174426509515, -CHAMFER3_SIZE * 0.984670194927), (0, 0), align=None)
    extrude(amount=6.323532163, mode=Mode.SUBTRACT)
    with BuildSketch(Plane(origin=(-0.5842, 5.417724239, 0.254), x_dir=(0.9846701949274143, 0, -0.17442650951506142), z_dir=(0, -1, 0)), Plane(origin=(4.4196, 0.10931576, 0.254), x_dir=(-0.9846701949274145, 0, -0.17442650951506075), z_dir=(0, 1, 0))) as chamfer3_piece_3:
        Polygon((CHAMFER3_SIZE_2 * 0.984670188803, CHAMFER3_SIZE_2 * 0.17442650843), (-CHAMFER3_SIZE * 0.174426509515, CHAMFER3_SIZE * 0.984670194927), (0, 0), align=None)
    extrude(amount=5.308408479, mode=Mode.SUBTRACT)
    with BuildSketch(Plane(origin=(-0.5842, 5.417724239, 1.016), x_dir=(-0.008003073799517023, 0, -0.9999679748920758), z_dir=(0, -1, 0)), Plane(origin=(4.4196, 0.10931576, 1.016), x_dir=(0.008003073799517865, 0, -0.9999679748920758), z_dir=(0, 1, 0))) as chamfer3_piece_4:
        Polygon((CHAMFER3_SIZE * 0.999967974892, CHAMFER3_SIZE * 0.00800307379952), (-CHAMFER3_SIZE_2 * 0.00800307374974, CHAMFER3_SIZE_2 * 0.999967968672), (0, 0), align=None)
    extrude(amount=5.308408479, mode=Mode.SUBTRACT)

    # Sketch14 → Cut-Extrude1 (cut)
    with BuildSketch(Plane.XY.offset(1.016)):
        with Locations((0, 1.27)):
            Circle(SKETCH14_R)
    extrude(amount=-CUT_EXTRUDE1_DEPTH, mode=Mode.SUBTRACT)


with BuildPart() as part_1:
    # Scale1: scaled about (1.91799889, 2.764451225, 0.609977057)
    add(part.part.scale(SCALE1_SCALE).moved(Location((-7.67199556, -11.0578049, -2.439908228))))

    # Fillet5
    fillet5_edges = [part_1.edges().sort_by_distance(p)[0] for p in [
        (-7.655962702, -12.799895691, -1.169908228),
        (-1.3059627, -12.79989569, -1.169908228),
        (5.0440373, -12.79989569, -1.169908228),
        (11.3940373, -12.79989569, -1.169908228),
        (-7.6559627, 18.31948589, -1.169908228),
        (-1.3059627, 18.31948589, -1.169908228),
        (5.0440373, 18.31948589, -1.169908228),
        (11.3940373, 18.31948589, -1.169908228),
    ]]
    fillet(fillet5_edges, radius=FILLET5_R)


solid = part_1.part
